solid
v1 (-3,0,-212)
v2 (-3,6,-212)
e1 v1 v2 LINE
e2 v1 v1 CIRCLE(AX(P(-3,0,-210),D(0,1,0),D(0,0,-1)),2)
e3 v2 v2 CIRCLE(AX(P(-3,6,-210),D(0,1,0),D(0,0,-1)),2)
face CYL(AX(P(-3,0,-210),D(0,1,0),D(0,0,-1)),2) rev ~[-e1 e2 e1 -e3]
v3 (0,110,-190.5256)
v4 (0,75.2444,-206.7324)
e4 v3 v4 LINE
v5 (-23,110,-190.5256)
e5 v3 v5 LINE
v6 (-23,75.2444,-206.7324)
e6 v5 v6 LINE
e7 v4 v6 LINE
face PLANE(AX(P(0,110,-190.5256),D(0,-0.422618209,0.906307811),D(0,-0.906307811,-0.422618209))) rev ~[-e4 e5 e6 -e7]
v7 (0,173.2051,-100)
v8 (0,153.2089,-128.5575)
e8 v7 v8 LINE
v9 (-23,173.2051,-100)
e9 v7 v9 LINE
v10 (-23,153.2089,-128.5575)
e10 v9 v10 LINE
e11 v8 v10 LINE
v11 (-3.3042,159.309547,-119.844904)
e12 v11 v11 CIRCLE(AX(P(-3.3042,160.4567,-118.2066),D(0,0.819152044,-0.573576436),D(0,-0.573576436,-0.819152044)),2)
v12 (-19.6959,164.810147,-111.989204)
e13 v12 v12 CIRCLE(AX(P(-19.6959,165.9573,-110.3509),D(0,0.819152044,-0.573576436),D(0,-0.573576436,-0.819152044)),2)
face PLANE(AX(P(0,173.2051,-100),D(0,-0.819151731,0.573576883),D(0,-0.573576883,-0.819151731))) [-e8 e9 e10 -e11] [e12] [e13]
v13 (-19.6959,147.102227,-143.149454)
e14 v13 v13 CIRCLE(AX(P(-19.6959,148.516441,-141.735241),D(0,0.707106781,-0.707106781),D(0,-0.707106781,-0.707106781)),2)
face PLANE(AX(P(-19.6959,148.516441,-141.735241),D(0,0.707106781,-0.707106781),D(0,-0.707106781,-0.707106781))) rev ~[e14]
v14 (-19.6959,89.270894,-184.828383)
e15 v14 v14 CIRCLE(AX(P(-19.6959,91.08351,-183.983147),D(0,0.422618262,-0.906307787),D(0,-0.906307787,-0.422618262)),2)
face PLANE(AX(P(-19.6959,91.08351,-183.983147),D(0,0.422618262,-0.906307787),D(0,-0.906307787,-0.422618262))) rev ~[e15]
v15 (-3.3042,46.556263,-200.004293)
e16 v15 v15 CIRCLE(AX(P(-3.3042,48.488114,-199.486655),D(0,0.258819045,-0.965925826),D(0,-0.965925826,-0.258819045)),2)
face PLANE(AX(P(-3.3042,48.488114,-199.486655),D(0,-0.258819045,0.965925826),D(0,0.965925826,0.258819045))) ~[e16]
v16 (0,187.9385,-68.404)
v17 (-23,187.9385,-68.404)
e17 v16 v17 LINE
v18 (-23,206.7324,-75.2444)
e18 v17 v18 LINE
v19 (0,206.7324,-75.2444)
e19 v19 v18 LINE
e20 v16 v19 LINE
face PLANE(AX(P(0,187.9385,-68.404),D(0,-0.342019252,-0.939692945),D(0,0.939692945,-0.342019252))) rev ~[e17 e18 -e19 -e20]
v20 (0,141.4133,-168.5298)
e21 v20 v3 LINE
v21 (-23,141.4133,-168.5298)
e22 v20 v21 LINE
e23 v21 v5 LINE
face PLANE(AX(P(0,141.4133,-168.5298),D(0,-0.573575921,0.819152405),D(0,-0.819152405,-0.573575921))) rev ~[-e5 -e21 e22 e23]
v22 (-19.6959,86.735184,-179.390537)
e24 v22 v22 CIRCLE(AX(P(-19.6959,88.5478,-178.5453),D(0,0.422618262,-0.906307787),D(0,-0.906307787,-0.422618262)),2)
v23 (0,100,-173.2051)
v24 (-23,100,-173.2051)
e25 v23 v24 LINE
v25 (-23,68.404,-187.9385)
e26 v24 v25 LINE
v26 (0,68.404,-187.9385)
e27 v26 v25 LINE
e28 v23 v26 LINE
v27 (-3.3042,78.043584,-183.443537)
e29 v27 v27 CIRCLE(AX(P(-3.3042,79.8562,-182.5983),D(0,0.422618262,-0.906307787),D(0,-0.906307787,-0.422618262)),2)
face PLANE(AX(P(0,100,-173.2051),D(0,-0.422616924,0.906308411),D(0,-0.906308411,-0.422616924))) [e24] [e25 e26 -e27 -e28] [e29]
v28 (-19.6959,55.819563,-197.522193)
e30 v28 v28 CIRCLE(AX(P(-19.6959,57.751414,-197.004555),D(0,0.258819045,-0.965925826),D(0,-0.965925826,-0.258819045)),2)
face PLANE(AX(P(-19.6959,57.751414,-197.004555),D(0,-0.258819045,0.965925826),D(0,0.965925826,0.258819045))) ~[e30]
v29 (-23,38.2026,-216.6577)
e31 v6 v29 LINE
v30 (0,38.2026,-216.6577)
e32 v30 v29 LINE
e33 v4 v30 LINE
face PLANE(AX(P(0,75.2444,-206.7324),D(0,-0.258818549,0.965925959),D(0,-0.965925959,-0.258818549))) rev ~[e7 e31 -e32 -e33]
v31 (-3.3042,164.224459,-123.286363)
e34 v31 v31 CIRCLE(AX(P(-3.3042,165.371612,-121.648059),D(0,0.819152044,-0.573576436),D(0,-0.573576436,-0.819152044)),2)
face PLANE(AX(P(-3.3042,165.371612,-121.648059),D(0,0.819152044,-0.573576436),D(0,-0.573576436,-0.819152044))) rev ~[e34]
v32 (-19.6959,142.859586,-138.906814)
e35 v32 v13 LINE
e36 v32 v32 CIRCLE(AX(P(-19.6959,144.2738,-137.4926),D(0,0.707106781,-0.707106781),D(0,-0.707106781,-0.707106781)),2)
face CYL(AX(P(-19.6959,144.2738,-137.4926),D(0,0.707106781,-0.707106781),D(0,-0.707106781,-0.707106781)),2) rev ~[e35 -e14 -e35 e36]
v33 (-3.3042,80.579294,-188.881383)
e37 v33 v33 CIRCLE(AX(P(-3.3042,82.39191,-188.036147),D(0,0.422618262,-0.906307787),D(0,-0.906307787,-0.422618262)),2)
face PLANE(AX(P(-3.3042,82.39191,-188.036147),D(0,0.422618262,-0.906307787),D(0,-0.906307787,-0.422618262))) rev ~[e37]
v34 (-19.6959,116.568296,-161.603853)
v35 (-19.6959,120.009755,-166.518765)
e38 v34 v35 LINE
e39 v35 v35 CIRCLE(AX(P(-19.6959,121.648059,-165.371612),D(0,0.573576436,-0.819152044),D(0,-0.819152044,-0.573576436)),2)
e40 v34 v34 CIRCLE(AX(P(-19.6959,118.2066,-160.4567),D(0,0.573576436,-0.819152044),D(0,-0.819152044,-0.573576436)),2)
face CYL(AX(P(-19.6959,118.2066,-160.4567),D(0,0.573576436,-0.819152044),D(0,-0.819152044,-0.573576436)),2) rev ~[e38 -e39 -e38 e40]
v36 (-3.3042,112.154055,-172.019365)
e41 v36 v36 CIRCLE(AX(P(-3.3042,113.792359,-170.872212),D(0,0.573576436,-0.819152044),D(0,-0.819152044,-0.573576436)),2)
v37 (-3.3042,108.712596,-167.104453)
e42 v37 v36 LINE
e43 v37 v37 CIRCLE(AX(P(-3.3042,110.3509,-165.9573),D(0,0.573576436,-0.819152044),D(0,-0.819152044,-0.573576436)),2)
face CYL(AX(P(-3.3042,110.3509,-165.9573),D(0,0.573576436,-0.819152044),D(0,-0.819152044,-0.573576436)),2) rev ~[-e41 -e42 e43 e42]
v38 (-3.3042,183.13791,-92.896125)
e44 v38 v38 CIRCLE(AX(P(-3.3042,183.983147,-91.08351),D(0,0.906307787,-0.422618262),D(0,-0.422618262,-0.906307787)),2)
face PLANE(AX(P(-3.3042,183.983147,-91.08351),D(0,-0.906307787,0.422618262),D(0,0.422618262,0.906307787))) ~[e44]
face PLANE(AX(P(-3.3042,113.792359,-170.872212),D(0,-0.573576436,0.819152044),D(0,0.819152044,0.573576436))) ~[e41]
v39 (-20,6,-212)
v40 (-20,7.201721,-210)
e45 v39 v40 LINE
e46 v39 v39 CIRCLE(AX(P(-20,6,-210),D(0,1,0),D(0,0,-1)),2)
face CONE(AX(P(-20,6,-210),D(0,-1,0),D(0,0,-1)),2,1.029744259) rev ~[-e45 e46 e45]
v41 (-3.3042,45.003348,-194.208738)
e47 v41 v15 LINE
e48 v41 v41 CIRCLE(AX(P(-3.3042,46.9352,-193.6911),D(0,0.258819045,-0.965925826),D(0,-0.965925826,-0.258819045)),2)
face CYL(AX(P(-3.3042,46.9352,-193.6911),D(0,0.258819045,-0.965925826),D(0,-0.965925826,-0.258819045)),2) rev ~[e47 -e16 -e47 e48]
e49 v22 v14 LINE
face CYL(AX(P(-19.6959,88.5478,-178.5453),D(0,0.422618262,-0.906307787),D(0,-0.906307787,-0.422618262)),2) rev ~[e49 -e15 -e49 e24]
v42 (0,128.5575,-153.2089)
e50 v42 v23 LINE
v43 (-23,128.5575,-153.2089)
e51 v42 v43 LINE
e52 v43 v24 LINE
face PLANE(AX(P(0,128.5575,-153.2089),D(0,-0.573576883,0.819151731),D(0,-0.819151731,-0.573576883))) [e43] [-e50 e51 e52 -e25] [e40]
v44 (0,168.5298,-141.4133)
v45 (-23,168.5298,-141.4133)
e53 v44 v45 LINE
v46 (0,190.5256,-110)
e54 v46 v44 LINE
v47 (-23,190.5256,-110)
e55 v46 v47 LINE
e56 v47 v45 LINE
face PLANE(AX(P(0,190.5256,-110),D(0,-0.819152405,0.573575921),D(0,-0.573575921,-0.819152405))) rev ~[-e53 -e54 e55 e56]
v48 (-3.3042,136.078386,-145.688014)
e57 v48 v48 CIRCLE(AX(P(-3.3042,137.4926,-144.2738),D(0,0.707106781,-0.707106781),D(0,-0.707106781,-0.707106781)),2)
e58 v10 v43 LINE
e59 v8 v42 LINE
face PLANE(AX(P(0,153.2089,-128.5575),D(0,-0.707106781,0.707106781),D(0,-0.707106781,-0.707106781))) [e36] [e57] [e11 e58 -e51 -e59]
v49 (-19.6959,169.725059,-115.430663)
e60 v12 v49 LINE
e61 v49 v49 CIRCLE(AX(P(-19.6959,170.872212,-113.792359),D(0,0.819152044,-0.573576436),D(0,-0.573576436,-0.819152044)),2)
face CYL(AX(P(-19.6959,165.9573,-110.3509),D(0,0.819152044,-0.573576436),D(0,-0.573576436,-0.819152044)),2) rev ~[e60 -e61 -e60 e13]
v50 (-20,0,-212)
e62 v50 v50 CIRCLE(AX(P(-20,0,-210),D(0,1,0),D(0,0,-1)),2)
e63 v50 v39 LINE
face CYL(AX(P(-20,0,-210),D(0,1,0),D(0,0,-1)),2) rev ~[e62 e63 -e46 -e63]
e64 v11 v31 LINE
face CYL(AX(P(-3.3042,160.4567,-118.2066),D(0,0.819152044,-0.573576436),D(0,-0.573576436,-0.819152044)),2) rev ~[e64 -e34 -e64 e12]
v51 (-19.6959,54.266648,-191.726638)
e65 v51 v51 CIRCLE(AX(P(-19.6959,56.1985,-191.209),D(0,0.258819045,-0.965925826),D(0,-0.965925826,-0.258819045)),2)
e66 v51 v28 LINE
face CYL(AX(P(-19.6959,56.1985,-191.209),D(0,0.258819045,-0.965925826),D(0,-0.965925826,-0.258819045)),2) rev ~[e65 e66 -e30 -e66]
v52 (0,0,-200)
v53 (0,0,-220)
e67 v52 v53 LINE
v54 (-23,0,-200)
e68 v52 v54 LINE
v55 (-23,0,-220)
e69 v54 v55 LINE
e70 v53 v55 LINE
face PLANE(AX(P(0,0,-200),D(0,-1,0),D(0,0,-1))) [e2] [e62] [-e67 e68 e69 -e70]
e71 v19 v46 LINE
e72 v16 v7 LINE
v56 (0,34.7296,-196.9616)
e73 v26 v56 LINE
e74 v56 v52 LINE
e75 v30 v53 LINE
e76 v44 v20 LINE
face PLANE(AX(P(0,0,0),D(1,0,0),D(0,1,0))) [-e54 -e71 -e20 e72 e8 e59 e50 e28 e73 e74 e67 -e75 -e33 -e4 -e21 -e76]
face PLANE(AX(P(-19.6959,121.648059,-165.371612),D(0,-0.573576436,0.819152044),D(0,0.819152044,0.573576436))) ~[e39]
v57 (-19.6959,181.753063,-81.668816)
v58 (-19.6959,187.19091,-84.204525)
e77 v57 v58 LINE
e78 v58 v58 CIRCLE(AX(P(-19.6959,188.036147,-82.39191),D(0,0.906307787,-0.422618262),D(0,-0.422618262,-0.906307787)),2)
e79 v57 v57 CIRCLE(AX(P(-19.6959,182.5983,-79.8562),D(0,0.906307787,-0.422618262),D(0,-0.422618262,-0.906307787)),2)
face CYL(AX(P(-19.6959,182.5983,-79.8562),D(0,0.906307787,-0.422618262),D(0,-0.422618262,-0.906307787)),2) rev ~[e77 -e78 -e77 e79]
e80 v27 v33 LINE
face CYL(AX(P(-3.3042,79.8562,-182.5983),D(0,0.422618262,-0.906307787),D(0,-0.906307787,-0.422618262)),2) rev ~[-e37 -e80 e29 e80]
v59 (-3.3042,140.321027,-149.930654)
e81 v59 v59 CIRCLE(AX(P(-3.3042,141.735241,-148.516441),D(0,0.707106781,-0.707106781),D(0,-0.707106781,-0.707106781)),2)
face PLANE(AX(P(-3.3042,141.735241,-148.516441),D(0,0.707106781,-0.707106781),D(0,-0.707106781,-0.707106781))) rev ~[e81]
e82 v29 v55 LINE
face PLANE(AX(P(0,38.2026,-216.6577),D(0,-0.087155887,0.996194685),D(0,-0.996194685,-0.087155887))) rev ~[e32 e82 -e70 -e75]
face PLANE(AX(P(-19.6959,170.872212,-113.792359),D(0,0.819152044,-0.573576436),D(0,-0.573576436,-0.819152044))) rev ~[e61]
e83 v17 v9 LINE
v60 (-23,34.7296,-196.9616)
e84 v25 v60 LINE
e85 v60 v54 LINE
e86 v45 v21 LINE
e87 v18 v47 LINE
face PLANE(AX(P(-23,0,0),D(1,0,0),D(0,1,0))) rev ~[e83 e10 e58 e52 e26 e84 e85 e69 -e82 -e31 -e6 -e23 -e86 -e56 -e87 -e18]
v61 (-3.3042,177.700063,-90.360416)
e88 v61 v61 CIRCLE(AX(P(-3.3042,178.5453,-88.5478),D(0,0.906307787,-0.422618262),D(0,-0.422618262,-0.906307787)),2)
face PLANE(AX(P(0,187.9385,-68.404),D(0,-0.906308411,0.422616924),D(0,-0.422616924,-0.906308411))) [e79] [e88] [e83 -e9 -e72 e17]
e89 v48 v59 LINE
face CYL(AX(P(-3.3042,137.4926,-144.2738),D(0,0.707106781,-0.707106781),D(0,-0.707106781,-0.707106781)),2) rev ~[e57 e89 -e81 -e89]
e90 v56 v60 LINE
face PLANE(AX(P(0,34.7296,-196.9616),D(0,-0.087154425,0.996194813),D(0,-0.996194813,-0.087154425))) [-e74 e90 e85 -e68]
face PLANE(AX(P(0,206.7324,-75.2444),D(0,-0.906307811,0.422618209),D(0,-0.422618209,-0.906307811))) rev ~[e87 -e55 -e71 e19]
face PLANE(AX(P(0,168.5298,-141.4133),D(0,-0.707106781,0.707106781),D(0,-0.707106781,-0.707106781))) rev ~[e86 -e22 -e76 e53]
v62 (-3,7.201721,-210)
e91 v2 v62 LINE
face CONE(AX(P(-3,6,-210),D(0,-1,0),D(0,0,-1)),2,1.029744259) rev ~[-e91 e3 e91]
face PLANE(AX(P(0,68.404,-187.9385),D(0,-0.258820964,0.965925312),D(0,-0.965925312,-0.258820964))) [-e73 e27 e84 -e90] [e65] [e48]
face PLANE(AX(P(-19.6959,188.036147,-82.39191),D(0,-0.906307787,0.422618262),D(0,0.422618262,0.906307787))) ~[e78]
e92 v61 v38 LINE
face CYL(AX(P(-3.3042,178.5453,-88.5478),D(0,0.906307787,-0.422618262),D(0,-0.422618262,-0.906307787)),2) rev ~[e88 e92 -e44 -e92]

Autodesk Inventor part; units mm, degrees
ref_plane "YZ Plane" through (0, 0, 0) normal (1, 0, 0) x (0, 1, 0)
ref_plane "XZ Plane" through (0, 0, 0) normal (0, 1, 0) x (-1, 0, 0)
ref_plane "XY Plane" through (0, 0, 0) normal (0, 0, 1) x (1, 0, 0)
sketch "Sketch1" plane through (0, 0, 0) normal (1, 0, 0) x (0, 1, 0)
  circle A0 centre (0, 0) radius 200 construction
  line L0 (0, 0) -> (293, 0) construction
  line L1 (0, 0) -> (315, -114.6506) construction
  line L2 (0, 0) -> (335.216, 0) construction
  line L3 (0, -200) -> (-34.7296, -196.9616)
  line L4 (-34.7296, -196.9616) -> (-68.404, -187.9385)
  line L5 (-68.404, -187.9385) -> (-100, -173.2051)
  line L6 (-100, -173.2051) -> (-128.5575, -153.2089)
  line L7 (-128.5575, -153.2089) -> (-153.2089, -128.5575)
  line L8 (-153.2089, -128.5575) -> (-173.2051, -100)
  line L9 (-173.2051, -100) -> (-187.9385, -68.404)
  line L10 (-187.9385, -68.404) -> (-196.9616, -34.7296)
  line L11 (-196.9616, -34.7296) -> (-200, 0)
  line L12 (-200, 0) -> (-196.9616, 34.7296)
  line L13 (-196.9616, 34.7296) -> (-187.9385, 68.404)
  line L14 (-187.9385, 68.404) -> (-173.2051, 100)
  line L15 (-173.2051, 100) -> (-153.2089, 128.5575)
  line L16 (-153.2089, 128.5575) -> (-128.5575, 153.2089)
  line L17 (-128.5575, 153.2089) -> (-100, 173.2051)
  line L18 (-100, 173.2051) -> (-68.404, 187.9385)
  line L19 (-68.404, 187.9385) -> (-34.7296, 196.9616)
  line L20 (-34.7296, 196.9616) -> (0, 200)
  line L21 (0, 200) -> (34.7296, 196.9616)
  line L22 (34.7296, 196.9616) -> (68.404, 187.9385)
  line L23 (68.404, 187.9385) -> (100, 173.2051)
  line L24 (100, 173.2051) -> (128.5575, 153.2089)
  line L25 (128.5575, 153.2089) -> (153.2089, 128.5575)
  line L26 (153.2089, 128.5575) -> (173.2051, 100)
  line L27 (173.2051, 100) -> (187.9385, 68.404)
  line L28 (187.9385, 68.404) -> (196.9616, 34.7296)
  line L29 (196.9616, 34.7296) -> (200, 0)
  line L30 (200, 0) -> (196.9616, -34.7296)
  line L31 (196.9616, -34.7296) -> (187.9385, -68.404)
  line L32 (187.9385, -68.404) -> (173.2051, -100)
  line L33 (173.2051, -100) -> (153.2089, -128.5575)
  line L34 (153.2089, -128.5575) -> (128.5575, -153.2089)
  line L35 (128.5575, -153.2089) -> (100, -173.2051)
  line L36 (100, -173.2051) -> (68.404, -187.9385)
  line L37 (68.404, -187.9385) -> (34.7296, -196.9616)
  line L38 (34.7296, -196.9616) -> (0, -200)
  circle A1 centre (0, 0) radius 220 construction
  line L39 (0, -220) -> (-38.2026, -216.6577)
  line L40 (-38.2026, -216.6577) -> (-75.2444, -206.7324)
  line L41 (-75.2444, -206.7324) -> (-110, -190.5256)
  line L42 (-110, -190.5256) -> (-141.4133, -168.5298)
  line L43 (-141.4133, -168.5298) -> (-168.5298, -141.4133)
  line L44 (-168.5298, -141.4133) -> (-190.5256, -110)
  line L45 (-190.5256, -110) -> (-206.7324, -75.2444)
  line L46 (-206.7324, -75.2444) -> (-216.6577, -38.2026)
  line L47 (-216.6577, -38.2026) -> (-220, 0)
  line L48 (-220, 0) -> (-216.6577, 38.2026)
  line L49 (-216.6577, 38.2026) -> (-206.7324, 75.2444)
  line L50 (-206.7324, 75.2444) -> (-190.5256, 110)
  line L51 (-190.5256, 110) -> (-168.5298, 141.4133)
  line L52 (-168.5298, 141.4133) -> (-141.4133, 168.5298)
  line L53 (-141.4133, 168.5298) -> (-110, 190.5256)
  line L54 (-110, 190.5256) -> (-75.2444, 206.7324)
  line L55 (-75.2444, 206.7324) -> (-38.2026, 216.6577)
  line L56 (-38.2026, 216.6577) -> (0, 220)
  line L57 (0, 220) -> (38.2026, 216.6577)
  line L58 (38.2026, 216.6577) -> (75.2444, 206.7324)
  line L59 (75.2444, 206.7324) -> (110, 190.5256)
  line L60 (110, 190.5256) -> (141.4133, 168.5298)
  line L61 (141.4133, 168.5298) -> (168.5298, 141.4133)
  line L62 (168.5298, 141.4133) -> (190.5256, 110)
  line L63 (190.5256, 110) -> (206.7324, 75.2444)
  line L64 (206.7324, 75.2444) -> (216.6577, 38.2026)
  line L65 (216.6577, 38.2026) -> (220, 0)
  line L66 (220, 0) -> (216.6577, -38.2026)
  line L67 (216.6577, -38.2026) -> (206.7324, -75.2444)
  line L68 (206.7324, -75.2444) -> (190.5256, -110)
  line L69 (190.5256, -110) -> (168.5298, -141.4133)
  line L70 (168.5298, -141.4133) -> (141.4133, -168.5298)
  line L71 (141.4133, -168.5298) -> (110, -190.5256)
  line L72 (110, -190.5256) -> (75.2444, -206.7324)
  line L73 (75.2444, -206.7324) -> (38.2026, -216.6577)
  line L74 (38.2026, -216.6577) -> (0, -220)
  line L75 (0, -200) -> (0, -220)
  line L76 (187.9385, -68.404) -> (206.7324, -75.2444)
  dimension "d0" = 400
  dimension "d2" = 440
  dimension "d1" = 20
extrude "Extrusion1" add sketch "Sketch1" against normal blind 23 contours L38 L37 L36 L35 L34 L33 L32 L76 L68 L69 L70 L71 L72 L73 L74 L75
sketch "Sketch2" plane through (-23, 34.7296, -196.9616) normal (0, -0.0871557, 0.9961947) x (1, 0, 0)
  line L0 (23, 0) -> (23, -34.8623)
  line L1 (23, 0) -> (0, 0)
  line L2 (0, -34.8623) -> (0, 0)
  line L3 (23, -34.8623) -> (0, -34.8623)
  line L4 (0, -33.9311) -> (23, -33.9311)
  line L5 (23, -33.9311) -> (23, -0.9311)
  line L6 (23, -0.9311) -> (0, -0.9311)
  line L7 (0, -0.9311) -> (0, -33.9311)
  line L8 (0, -33.9311) -> (23, -0.9311) construction
  line L9 (23, -33.9311) -> (0, -0.9311) construction
  point P0 (23, -17.4311)
  point P1 (11.5, -17.4311)
  point P2 (3.4356, -12.6296)
  point P3 (19.8273, -22.2197)
  dimension "d5" = 34.8623
  dimension "d6" = 23
  dimension "d7" = 23
  dimension "d8" = 33
  dimension "d10" = 3.4356
  dimension "d11" = 21.3015
  dimension "d12" = 19.8273
  dimension "d13" = 11.7114
sketch "Sketch9" plane through (-23.1315, 68.3978, -187.9402) normal (0, -0.258819, 0.9659258) x (1, 0, 0)
  line L0 (23, 0) -> (23, -34.8623)
  line L1 (23, 0) -> (0, 0)
  line L2 (0, -34.8623) -> (0, 0)
  line L3 (23, -34.8623) -> (0, -34.8623)
  line L4 (0, -33.9311) -> (23, -33.9311)
  line L5 (23, -33.9311) -> (23, -0.9311)
  line L6 (23, -0.9311) -> (0, -0.9311)
  line L7 (0, -0.9311) -> (0, -33.9311)
  line L8 (0, -33.9311) -> (23, -0.9311) construction
  line L9 (23, -33.9311) -> (0, -0.9311) construction
  point P0 (23, -17.4311)
  point P1 (11.5, -17.4311)
  point P2 (3.4356, -12.6296)
  point P3 (19.8273, -22.2197)
  dimension "d124" = 34.8623
  dimension "d125" = 23
  dimension "d116" = 23
  dimension "d117" = 33
  dimension "d115" = 3.4356
  dimension "d114" = 21.3015
  dimension "d113" = 19.8273
  dimension "d112" = 11.7114
hole "Hole8" at (-19.6959, 56.1985, -191.209) at (-3.3042, 46.9352, -193.6911) direction (0, 0.258819, -0.9659258) diameter 4 depth 6
sketch "Sketch10" plane through (-23.1315, 99.9942, -173.2078) normal (0, -0.4226183, 0.9063078) x (1, 0, 0)
  line L0 (23, 0) -> (23, -34.8623)
  line L1 (23, 0) -> (0, 0)
  line L2 (0, -34.8623) -> (0, 0)
  line L3 (23, -34.8623) -> (0, -34.8623)
  line L4 (0, -33.9311) -> (23, -33.9311)
  line L5 (23, -33.9311) -> (23, -0.9311)
  line L6 (23, -0.9311) -> (0, -0.9311)
  line L7 (0, -0.9311) -> (0, -33.9311)
  line L8 (0, -33.9311) -> (23, -0.9311) construction
  line L9 (23, -33.9311) -> (0, -0.9311) construction
  point P0 (23, -17.4311)
  point P1 (11.5, -17.4311)
  point P2 (3.4356, -12.6296)
  point P3 (19.8273, -22.2197)
  dimension "d139" = 34.8623
  dimension "d140" = 23
  dimension "d131" = 23
  dimension "d132" = 33
  dimension "d130" = 3.4356
  dimension "d129" = 21.3015
  dimension "d128" = 19.8273
  dimension "d127" = 11.7114
hole "Hole9" at (-19.6959, 88.5478, -178.5453) at (-3.3042, 79.8562, -182.5983) direction (0, 0.4226183, -0.9063078) diameter 4 depth 6
sketch "Sketch11" plane through (-23.1315, 128.5522, -153.2126) normal (0, -0.5735764, 0.819152) x (1, 0, 0)
  line L0 (23, 0) -> (23, -34.8623)
  line L1 (23, 0) -> (0, 0)
  line L2 (0, -34.8623) -> (0, 0)
  line L3 (23, -34.8623) -> (0, -34.8623)
  line L4 (0, -33.9311) -> (23, -33.9311)
  line L5 (23, -33.9311) -> (23, -0.9311)
  line L6 (23, -0.9311) -> (0, -0.9311)
  line L7 (0, -0.9311) -> (0, -33.9311)
  line L8 (0, -33.9311) -> (23, -0.9311) construction
  line L9 (23, -33.9311) -> (0, -0.9311) construction
  point P0 (23, -17.4311)
  point P1 (11.5, -17.4311)
  point P2 (3.4356, -12.6296)
  point P3 (19.8273, -22.2197)
  dimension "d154" = 34.8623
  dimension "d155" = 23
  dimension "d146" = 23
  dimension "d147" = 33
  dimension "d145" = 3.4356
  dimension "d144" = 21.3015
  dimension "d143" = 19.8273
  dimension "d142" = 11.7114
hole "Hole10" at (-19.6959, 118.2066, -160.4567) at (-3.3042, 110.3509, -165.9573) direction (0, 0.5735764, -0.819152) diameter 4 depth 6
sketch "Sketch12" plane through (-23.1315, 153.2043, -128.5621) normal (0, -0.7071068, 0.7071068) x (1, 0, 0)
  line L0 (23, 0) -> (23, -34.8623)
  line L1 (23, 0) -> (0, 0)
  line L2 (0, -34.8623) -> (0, 0)
  line L3 (23, -34.8623) -> (0, -34.8623)
  line L4 (0, -33.9311) -> (23, -33.9311)
  line L5 (23, -33.9311) -> (23, -0.9311)
  line L6 (23, -0.9311) -> (0, -0.9311)
  line L7 (0, -0.9311) -> (0, -33.9311)
  line L8 (0, -33.9311) -> (23, -0.9311) construction
  line L9 (23, -33.9311) -> (0, -0.9311) construction
  point P0 (23, -17.4311)
  point P1 (11.5, -17.4311)
  point P2 (3.4356, -12.6296)
  point P3 (19.8273, -22.2197)
  dimension "d169" = 34.8623
  dimension "d170" = 23
  dimension "d161" = 23
  dimension "d162" = 33
  dimension "d160" = 3.4356
  dimension "d159" = 21.3015
  dimension "d158" = 19.8273
  dimension "d157" = 11.7114
hole "Hole11" at (-19.6959, 144.2738, -137.4926) at (-3.3042, 137.4926, -144.2738) direction (0, 0.7071068, -0.7071068) diameter 4 depth 6
sketch "Sketch13" plane through (-23.1315, 173.2014, -100.0053) normal (0, -0.819152, 0.5735764) x (1, 0, 0)
  line L0 (23, 0) -> (23, -34.8623)
  line L1 (23, 0) -> (0, 0)
  line L2 (0, -34.8623) -> (0, 0)
  line L3 (23, -34.8623) -> (0, -34.8623)
  line L4 (0, -33.9311) -> (23, -33.9311)
  line L5 (23, -33.9311) -> (23, -0.9311)
  line L6 (23, -0.9311) -> (0, -0.9311)
  line L7 (0, -0.9311) -> (0, -33.9311)
  line L8 (0, -33.9311) -> (23, -0.9311) construction
  line L9 (23, -33.9311) -> (0, -0.9311) construction
  point P0 (23, -17.4311)
  point P1 (11.5, -17.4311)
  point P2 (3.4356, -12.6296)
  point P3 (19.8273, -22.2197)
  dimension "d184" = 34.8623
  dimension "d185" = 23
  dimension "d176" = 23
  dimension "d177" = 33
  dimension "d175" = 3.4356
  dimension "d174" = 21.3015
  dimension "d173" = 19.8273
  dimension "d172" = 11.7114
hole "Hole12" at (-19.6959, 165.9573, -110.3509) at (-3.3042, 160.4567, -118.2066) direction (0, 0.819152, -0.5735764) diameter 4 depth 6
sketch "Sketch14" plane through (-23.1315, 187.9358, -68.4099) normal (0, -0.9063078, 0.4226183) x (1, 0, 0)
  line L0 (23, 0) -> (23, -34.8623)
  line L1 (23, 0) -> (0, 0)
  line L2 (0, -34.8623) -> (0, 0)
  line L3 (23, -34.8623) -> (0, -34.8623)
  line L4 (0, -33.9311) -> (23, -33.9311)
  line L5 (23, -33.9311) -> (23, -0.9311)
  line L6 (23, -0.9311) -> (0, -0.9311)
  line L7 (0, -0.9311) -> (0, -33.9311)
  line L8 (0, -33.9311) -> (23, -0.9311) construction
  line L9 (23, -33.9311) -> (0, -0.9311) construction
  point P0 (23, -17.4311)
  point P1 (11.5, -17.4311)
  point P2 (3.4356, -12.6296)
  point P3 (19.8273, -22.2197)
  dimension "d199" = 34.8623
  dimension "d200" = 23
  dimension "d191" = 23
  dimension "d192" = 33
  dimension "d190" = 3.4356
  dimension "d189" = 21.3015
  dimension "d188" = 19.8273
  dimension "d187" = 11.7114
hole "Hole13" at (-19.6959, 182.5983, -79.8562) at (-3.3042, 178.5453, -88.5478) direction (0, 0.9063078, -0.4226183) diameter 4 depth 6
sketch "Sketch15" plane through (0, 0, -220) normal (0, -1, 0) x (1, 0, 0)
  line L0 (0, 20) -> (0, 0) projected
  line L1 (0, 20) -> (-23, 20) projected
  line L2 (-23, 0) -> (-23, 20) projected
  line L3 (0, 0) -> (-23, 0) projected
  point P0 (0, 220)
  point P1 (-3, 10)
  point P2 (-20, 10)
  dimension "d201" = 3
  dimension "d202" = 3
hole "Hole14" at (-20, 0, -210) at (-3, 0, -210) direction (0, 1, 0) diameter 4 depth 6 tip angle 118
equation "\"d116\" = d7"
equation "\"d117\" = d8"
equation "\"d115\" = d10"
equation "\"d114\" = d11"
equation "\"d113\" = d12"
equation "\"d112\" = d13"
equation "\"d123\" = d14"
equation "\"d122\" = d19"
equation "\"d131\" = d7"
equation "\"d132\" = d8"
equation "\"d130\" = d10"
equation "\"d129\" = d11"
equation "\"d128\" = d12"
equation "\"d127\" = d13"
equation "\"d138\" = d14"
equation "\"d137\" = d19"
equation "\"d146\" = d7"
equation "\"d147\" = d8"
equation "\"d145\" = d10"
equation "\"d144\" = d11"
equation "\"d143\" = d12"
equation "\"d142\" = d13"
equation "\"d153\" = d14"
equation "\"d152\" = d19"
equation "\"d161\" = d7"
equation "\"d162\" = d8"
equation "\"d160\" = d10"
equation "\"d159\" = d11"
equation "\"d158\" = d12"
equation "\"d157\" = d13"
equation "\"d168\" = d14"
equation "\"d167\" = d19"
equation "\"d176\" = d7"
equation "\"d177\" = d8"
equation "\"d175\" = d10"
equation "\"d174\" = d11"
equation "\"d173\" = d12"
equation "\"d172\" = d13"
equation "\"d183\" = d14"
equation "\"d182\" = d19"
equation "\"d191\" = d7"
equation "\"d192\" = d8"
equation "\"d190\" = d10"
equation "\"d189\" = d11"
equation "\"d188\" = d12"
equation "\"d187\" = d13"
equation "\"d198\" = d14"
equation "\"d197\" = d19"
equation "\"d202\" = d201"
equation "\"d14\" = 4"
equation "\"d19\" = 6"
properties part number "fourche_v2_sans_radiateurs"
